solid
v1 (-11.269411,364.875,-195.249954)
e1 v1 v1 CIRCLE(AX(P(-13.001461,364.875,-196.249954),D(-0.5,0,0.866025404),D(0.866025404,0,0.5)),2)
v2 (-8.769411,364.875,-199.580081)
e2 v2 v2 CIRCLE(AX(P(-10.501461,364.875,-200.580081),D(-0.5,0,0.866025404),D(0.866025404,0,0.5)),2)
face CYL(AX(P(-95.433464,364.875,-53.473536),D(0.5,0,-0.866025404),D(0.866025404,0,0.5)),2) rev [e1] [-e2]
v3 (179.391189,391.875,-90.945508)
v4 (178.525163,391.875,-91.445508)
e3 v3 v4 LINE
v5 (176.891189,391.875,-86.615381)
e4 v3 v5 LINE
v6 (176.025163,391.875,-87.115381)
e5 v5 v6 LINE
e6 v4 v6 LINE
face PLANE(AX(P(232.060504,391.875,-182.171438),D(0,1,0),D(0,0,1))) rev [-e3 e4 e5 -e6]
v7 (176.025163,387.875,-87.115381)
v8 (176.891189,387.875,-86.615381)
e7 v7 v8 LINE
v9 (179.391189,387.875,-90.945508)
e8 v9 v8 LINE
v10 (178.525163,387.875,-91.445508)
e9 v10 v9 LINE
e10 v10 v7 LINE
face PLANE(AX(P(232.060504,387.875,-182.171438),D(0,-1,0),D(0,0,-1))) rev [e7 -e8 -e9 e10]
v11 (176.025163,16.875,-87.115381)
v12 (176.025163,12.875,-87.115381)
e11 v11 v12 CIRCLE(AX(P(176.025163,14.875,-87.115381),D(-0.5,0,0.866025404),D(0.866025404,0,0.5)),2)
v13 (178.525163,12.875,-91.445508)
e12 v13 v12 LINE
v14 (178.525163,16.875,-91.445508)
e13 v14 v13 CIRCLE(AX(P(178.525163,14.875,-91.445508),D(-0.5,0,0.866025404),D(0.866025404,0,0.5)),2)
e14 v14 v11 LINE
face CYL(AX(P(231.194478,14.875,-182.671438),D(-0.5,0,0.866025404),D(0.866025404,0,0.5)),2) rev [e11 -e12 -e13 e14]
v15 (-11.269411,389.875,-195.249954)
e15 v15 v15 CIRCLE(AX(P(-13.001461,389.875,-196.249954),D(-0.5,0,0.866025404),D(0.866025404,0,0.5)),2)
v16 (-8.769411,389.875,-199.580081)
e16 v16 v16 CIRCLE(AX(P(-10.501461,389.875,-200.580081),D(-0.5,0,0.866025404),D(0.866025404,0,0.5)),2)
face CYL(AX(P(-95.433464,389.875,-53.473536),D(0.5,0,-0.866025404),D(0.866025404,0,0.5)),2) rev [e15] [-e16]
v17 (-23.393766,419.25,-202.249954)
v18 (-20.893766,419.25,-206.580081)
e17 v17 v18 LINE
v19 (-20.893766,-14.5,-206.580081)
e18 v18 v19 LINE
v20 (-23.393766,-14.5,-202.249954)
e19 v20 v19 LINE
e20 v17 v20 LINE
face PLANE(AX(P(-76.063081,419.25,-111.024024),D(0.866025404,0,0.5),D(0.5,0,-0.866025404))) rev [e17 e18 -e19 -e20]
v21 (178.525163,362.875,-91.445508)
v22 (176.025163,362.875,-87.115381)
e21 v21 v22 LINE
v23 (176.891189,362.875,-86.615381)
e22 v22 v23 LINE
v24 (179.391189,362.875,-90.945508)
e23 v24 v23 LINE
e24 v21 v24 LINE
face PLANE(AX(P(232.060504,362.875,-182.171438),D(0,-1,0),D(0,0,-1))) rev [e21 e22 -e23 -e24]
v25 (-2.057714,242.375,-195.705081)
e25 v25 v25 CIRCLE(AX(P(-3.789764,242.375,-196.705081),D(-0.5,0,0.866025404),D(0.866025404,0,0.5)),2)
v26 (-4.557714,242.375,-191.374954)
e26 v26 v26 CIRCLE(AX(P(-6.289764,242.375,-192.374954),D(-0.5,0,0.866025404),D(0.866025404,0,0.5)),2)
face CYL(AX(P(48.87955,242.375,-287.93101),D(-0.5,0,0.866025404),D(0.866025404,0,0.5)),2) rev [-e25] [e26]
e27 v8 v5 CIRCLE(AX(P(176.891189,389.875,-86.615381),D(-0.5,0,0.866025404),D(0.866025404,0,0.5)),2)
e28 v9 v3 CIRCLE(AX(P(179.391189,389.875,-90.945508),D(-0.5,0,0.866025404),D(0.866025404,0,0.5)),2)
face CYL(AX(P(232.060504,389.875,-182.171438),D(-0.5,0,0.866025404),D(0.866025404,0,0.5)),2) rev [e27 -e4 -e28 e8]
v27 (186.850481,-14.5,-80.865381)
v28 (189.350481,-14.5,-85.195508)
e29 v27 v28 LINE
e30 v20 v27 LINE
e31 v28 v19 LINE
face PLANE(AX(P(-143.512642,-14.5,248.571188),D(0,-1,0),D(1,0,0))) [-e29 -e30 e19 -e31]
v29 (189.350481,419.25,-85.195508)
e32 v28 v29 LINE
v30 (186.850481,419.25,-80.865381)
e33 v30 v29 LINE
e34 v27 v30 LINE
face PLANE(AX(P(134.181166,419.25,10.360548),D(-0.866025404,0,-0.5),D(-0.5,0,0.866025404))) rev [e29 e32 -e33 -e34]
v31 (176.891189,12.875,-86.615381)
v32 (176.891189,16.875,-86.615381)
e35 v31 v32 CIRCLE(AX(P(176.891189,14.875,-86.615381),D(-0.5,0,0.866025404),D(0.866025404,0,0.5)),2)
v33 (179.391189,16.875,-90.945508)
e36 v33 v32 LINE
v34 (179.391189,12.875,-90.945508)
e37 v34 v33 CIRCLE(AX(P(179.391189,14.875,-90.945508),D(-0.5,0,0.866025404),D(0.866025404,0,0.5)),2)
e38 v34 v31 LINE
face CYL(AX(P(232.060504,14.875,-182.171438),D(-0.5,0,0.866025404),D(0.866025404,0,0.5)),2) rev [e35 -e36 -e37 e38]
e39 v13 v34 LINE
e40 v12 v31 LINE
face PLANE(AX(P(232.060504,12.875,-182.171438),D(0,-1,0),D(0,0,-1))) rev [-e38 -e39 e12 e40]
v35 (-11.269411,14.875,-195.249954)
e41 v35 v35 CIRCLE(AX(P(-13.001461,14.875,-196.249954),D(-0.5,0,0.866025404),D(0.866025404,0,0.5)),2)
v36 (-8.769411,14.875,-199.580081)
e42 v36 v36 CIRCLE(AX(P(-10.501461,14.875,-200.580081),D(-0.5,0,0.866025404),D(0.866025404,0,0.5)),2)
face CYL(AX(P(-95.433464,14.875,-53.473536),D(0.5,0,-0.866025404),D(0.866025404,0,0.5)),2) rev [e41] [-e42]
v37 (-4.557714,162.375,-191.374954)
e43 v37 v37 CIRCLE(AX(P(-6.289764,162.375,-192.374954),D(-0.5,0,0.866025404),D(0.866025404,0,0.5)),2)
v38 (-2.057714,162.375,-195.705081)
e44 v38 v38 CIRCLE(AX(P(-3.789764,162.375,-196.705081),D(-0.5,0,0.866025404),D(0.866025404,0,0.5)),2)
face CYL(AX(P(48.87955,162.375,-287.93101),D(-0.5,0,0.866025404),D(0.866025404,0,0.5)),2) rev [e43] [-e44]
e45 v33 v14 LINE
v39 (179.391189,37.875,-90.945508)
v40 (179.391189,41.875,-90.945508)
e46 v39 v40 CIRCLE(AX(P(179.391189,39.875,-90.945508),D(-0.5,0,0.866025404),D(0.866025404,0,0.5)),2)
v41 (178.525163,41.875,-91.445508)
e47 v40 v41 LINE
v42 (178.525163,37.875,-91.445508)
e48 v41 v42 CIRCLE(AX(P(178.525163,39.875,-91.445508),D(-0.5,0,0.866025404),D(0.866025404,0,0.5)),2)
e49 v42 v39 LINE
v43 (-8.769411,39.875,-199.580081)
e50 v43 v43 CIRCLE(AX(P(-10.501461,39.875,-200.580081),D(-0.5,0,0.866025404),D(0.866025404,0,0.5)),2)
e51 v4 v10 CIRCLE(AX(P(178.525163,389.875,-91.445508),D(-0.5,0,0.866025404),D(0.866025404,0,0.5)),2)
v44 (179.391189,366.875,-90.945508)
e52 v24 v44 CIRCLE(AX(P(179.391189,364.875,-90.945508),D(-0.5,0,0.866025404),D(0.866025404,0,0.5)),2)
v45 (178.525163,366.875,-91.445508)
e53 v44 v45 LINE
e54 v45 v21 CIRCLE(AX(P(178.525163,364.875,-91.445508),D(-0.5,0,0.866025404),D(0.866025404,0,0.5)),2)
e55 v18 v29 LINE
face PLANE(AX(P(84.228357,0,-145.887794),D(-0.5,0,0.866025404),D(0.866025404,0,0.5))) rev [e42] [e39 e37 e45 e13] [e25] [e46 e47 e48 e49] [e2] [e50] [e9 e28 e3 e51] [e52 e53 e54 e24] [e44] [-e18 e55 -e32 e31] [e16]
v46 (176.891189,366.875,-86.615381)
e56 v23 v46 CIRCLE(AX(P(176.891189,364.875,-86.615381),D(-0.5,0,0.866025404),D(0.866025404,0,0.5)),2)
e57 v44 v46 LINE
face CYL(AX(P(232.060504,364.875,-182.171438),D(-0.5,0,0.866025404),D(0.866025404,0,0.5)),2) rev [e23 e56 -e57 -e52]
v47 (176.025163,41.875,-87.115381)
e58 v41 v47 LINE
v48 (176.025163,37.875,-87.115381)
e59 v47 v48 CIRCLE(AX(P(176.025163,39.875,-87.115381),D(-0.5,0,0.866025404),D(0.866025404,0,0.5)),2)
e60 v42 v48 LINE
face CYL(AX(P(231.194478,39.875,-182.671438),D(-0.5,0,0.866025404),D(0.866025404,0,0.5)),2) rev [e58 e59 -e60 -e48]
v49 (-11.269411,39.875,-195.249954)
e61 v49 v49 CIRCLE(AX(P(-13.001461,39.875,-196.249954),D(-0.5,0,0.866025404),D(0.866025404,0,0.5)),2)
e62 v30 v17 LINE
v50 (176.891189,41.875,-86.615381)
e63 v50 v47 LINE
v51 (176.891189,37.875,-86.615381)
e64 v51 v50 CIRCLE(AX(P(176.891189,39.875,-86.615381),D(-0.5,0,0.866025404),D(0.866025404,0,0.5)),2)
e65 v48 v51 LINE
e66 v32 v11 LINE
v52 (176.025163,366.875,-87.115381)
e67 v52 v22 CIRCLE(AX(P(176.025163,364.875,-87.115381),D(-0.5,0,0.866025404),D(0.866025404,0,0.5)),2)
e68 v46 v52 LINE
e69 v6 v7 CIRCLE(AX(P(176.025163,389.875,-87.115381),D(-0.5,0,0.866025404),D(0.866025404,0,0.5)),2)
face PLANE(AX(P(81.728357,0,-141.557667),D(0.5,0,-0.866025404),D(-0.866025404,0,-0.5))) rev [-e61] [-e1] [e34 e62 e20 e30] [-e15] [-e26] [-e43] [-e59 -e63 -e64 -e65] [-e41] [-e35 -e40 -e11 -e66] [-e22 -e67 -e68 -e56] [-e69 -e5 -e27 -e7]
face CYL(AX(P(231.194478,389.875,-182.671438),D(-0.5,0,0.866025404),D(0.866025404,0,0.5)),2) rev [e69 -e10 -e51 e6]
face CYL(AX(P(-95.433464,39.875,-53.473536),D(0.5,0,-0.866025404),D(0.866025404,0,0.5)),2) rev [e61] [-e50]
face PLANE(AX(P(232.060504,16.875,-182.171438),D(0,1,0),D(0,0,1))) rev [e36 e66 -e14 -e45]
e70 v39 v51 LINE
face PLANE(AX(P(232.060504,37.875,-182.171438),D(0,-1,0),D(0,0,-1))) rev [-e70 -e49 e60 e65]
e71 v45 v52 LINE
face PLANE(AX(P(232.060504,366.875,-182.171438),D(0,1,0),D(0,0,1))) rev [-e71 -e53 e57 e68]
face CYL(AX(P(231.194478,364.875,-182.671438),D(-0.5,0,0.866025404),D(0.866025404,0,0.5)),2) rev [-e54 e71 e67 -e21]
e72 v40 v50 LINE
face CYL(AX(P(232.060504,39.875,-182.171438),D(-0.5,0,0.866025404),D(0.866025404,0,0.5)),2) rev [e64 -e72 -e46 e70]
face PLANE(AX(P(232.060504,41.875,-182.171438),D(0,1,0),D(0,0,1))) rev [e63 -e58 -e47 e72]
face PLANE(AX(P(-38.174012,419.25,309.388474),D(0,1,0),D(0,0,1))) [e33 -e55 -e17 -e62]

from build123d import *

# Parameters (mm, degrees)
STOCK_ACRYLIC_DOOR_MASTER_1_START     = 163.456714755
STOCK_ACRYLIC_DOOR_MASTER_1_OUTLINE_W = 243.269145362
STOCK_ACRYLIC_DOOR_MASTER_1_OUTLINE_H = 433.75
STOCK_ACRYLIC_DOOR_MASTER_1_OUTLINE_R = 2
STOCK_ACRYLIC_DOOR_MASTER_1_DEPTH     = 5
SKETCH1_W                             = 0.25
SKETCH1_H                             = 433.75
CUT_EXTRUDE1_DEPTH                    = 438.771536387


# Read off the part's stored shape, not the designer's step: Stock-acrylic-door-master-1
with BuildPart() as part:
    # Stock-acrylic-door-master-1 outline → Stock-acrylic-door-master-1 (new body)
    with BuildSketch(Plane(origin=(0, 0, 0), x_dir=(0.866025403784438, 0, 0.500000000000001), z_dir=(0.500000000000001, 0, -0.866025403784438)).offset(STOCK_ACRYLIC_DOOR_MASTER_1_START)):
        with Locations((0, -202.375)):
            Rectangle(STOCK_ACRYLIC_DOOR_MASTER_1_OUTLINE_W, STOCK_ACRYLIC_DOOR_MASTER_1_OUTLINE_H)
        with Locations((-109.384572681, -389.875)):
            Circle(STOCK_ACRYLIC_DOOR_MASTER_1_OUTLINE_R, mode=Mode.SUBTRACT)
        with Locations((-109.384572681, -364.875)):
            Circle(STOCK_ACRYLIC_DOOR_MASTER_1_OUTLINE_R, mode=Mode.SUBTRACT)
        with Locations((-101.634572681, -242.375)):
            Circle(STOCK_ACRYLIC_DOOR_MASTER_1_OUTLINE_R, mode=Mode.SUBTRACT)
        with BuildLine():
            Line((108.884572681, -387.875), (109.884572681, -387.875))
            ThreePointArc((109.884572681, -387.875), (111.884572681, -389.875), (109.884572681, -391.875))
            Line((109.884572681, -391.875), (108.884572681, -391.875))
            ThreePointArc((108.884572681, -391.875), (106.884572681, -389.875), (108.884572681, -387.875))
        make_face(mode=Mode.SUBTRACT)
        with BuildLine():
            Line((108.884572681, -362.875), (109.884572681, -362.875))
            ThreePointArc((109.884572681, -362.875), (111.884572681, -364.875), (109.884572681, -366.875))
            Line((109.884572681, -366.875), (108.884572681, -366.875))
            ThreePointArc((108.884572681, -366.875), (106.884572681, -364.875), (108.884572681, -362.875))
        make_face(mode=Mode.SUBTRACT)
        with Locations((-101.634572681, -162.375)):
            Circle(STOCK_ACRYLIC_DOOR_MASTER_1_OUTLINE_R, mode=Mode.SUBTRACT)
        with Locations((-109.384572681, -39.875)):
            Circle(STOCK_ACRYLIC_DOOR_MASTER_1_OUTLINE_R, mode=Mode.SUBTRACT)
        with Locations((-109.384572681, -14.875)):
            Circle(STOCK_ACRYLIC_DOOR_MASTER_1_OUTLINE_R, mode=Mode.SUBTRACT)
        with BuildLine():
            Line((108.884572681, -37.875), (109.884572681, -37.875))
            ThreePointArc((109.884572681, -37.875), (111.884572681, -39.875), (109.884572681, -41.875))
            Line((109.884572681, -41.875), (108.884572681, -41.875))
            ThreePointArc((108.884572681, -41.875), (106.884572681, -39.875), (108.884572681, -37.875))
        make_face(mode=Mode.SUBTRACT)
        with BuildLine():
            Line((108.884572681, -12.875), (109.884572681, -12.875))
            ThreePointArc((109.884572681, -12.875), (111.884572681, -14.875), (109.884572681, -16.875))
            Line((109.884572681, -16.875), (108.884572681, -16.875))
            ThreePointArc((108.884572681, -16.875), (106.884572681, -14.875), (108.884572681, -12.875))
        make_face(mode=Mode.SUBTRACT)
    extrude(amount=STOCK_ACRYLIC_DOOR_MASTER_1_DEPTH)

    # Sketch1 → Cut-Extrude1 (cut, through all)
    with BuildSketch(Plane(origin=(84.228357378, 0, -145.887794416), x_dir=(-0.866025403784438, 0, -0.5000000000000012), z_dir=(0.5000000000000011, 0, -0.8660254037844379))):
        with Locations((-121.509572681, 202.375)):
            Rectangle(SKETCH1_W, SKETCH1_H)
        with Locations((121.509572681, 202.375)):
            Rectangle(SKETCH1_W, SKETCH1_H)
    extrude(amount=-CUT_EXTRUDE1_DEPTH, mode=Mode.SUBTRACT)


solid = part.part
